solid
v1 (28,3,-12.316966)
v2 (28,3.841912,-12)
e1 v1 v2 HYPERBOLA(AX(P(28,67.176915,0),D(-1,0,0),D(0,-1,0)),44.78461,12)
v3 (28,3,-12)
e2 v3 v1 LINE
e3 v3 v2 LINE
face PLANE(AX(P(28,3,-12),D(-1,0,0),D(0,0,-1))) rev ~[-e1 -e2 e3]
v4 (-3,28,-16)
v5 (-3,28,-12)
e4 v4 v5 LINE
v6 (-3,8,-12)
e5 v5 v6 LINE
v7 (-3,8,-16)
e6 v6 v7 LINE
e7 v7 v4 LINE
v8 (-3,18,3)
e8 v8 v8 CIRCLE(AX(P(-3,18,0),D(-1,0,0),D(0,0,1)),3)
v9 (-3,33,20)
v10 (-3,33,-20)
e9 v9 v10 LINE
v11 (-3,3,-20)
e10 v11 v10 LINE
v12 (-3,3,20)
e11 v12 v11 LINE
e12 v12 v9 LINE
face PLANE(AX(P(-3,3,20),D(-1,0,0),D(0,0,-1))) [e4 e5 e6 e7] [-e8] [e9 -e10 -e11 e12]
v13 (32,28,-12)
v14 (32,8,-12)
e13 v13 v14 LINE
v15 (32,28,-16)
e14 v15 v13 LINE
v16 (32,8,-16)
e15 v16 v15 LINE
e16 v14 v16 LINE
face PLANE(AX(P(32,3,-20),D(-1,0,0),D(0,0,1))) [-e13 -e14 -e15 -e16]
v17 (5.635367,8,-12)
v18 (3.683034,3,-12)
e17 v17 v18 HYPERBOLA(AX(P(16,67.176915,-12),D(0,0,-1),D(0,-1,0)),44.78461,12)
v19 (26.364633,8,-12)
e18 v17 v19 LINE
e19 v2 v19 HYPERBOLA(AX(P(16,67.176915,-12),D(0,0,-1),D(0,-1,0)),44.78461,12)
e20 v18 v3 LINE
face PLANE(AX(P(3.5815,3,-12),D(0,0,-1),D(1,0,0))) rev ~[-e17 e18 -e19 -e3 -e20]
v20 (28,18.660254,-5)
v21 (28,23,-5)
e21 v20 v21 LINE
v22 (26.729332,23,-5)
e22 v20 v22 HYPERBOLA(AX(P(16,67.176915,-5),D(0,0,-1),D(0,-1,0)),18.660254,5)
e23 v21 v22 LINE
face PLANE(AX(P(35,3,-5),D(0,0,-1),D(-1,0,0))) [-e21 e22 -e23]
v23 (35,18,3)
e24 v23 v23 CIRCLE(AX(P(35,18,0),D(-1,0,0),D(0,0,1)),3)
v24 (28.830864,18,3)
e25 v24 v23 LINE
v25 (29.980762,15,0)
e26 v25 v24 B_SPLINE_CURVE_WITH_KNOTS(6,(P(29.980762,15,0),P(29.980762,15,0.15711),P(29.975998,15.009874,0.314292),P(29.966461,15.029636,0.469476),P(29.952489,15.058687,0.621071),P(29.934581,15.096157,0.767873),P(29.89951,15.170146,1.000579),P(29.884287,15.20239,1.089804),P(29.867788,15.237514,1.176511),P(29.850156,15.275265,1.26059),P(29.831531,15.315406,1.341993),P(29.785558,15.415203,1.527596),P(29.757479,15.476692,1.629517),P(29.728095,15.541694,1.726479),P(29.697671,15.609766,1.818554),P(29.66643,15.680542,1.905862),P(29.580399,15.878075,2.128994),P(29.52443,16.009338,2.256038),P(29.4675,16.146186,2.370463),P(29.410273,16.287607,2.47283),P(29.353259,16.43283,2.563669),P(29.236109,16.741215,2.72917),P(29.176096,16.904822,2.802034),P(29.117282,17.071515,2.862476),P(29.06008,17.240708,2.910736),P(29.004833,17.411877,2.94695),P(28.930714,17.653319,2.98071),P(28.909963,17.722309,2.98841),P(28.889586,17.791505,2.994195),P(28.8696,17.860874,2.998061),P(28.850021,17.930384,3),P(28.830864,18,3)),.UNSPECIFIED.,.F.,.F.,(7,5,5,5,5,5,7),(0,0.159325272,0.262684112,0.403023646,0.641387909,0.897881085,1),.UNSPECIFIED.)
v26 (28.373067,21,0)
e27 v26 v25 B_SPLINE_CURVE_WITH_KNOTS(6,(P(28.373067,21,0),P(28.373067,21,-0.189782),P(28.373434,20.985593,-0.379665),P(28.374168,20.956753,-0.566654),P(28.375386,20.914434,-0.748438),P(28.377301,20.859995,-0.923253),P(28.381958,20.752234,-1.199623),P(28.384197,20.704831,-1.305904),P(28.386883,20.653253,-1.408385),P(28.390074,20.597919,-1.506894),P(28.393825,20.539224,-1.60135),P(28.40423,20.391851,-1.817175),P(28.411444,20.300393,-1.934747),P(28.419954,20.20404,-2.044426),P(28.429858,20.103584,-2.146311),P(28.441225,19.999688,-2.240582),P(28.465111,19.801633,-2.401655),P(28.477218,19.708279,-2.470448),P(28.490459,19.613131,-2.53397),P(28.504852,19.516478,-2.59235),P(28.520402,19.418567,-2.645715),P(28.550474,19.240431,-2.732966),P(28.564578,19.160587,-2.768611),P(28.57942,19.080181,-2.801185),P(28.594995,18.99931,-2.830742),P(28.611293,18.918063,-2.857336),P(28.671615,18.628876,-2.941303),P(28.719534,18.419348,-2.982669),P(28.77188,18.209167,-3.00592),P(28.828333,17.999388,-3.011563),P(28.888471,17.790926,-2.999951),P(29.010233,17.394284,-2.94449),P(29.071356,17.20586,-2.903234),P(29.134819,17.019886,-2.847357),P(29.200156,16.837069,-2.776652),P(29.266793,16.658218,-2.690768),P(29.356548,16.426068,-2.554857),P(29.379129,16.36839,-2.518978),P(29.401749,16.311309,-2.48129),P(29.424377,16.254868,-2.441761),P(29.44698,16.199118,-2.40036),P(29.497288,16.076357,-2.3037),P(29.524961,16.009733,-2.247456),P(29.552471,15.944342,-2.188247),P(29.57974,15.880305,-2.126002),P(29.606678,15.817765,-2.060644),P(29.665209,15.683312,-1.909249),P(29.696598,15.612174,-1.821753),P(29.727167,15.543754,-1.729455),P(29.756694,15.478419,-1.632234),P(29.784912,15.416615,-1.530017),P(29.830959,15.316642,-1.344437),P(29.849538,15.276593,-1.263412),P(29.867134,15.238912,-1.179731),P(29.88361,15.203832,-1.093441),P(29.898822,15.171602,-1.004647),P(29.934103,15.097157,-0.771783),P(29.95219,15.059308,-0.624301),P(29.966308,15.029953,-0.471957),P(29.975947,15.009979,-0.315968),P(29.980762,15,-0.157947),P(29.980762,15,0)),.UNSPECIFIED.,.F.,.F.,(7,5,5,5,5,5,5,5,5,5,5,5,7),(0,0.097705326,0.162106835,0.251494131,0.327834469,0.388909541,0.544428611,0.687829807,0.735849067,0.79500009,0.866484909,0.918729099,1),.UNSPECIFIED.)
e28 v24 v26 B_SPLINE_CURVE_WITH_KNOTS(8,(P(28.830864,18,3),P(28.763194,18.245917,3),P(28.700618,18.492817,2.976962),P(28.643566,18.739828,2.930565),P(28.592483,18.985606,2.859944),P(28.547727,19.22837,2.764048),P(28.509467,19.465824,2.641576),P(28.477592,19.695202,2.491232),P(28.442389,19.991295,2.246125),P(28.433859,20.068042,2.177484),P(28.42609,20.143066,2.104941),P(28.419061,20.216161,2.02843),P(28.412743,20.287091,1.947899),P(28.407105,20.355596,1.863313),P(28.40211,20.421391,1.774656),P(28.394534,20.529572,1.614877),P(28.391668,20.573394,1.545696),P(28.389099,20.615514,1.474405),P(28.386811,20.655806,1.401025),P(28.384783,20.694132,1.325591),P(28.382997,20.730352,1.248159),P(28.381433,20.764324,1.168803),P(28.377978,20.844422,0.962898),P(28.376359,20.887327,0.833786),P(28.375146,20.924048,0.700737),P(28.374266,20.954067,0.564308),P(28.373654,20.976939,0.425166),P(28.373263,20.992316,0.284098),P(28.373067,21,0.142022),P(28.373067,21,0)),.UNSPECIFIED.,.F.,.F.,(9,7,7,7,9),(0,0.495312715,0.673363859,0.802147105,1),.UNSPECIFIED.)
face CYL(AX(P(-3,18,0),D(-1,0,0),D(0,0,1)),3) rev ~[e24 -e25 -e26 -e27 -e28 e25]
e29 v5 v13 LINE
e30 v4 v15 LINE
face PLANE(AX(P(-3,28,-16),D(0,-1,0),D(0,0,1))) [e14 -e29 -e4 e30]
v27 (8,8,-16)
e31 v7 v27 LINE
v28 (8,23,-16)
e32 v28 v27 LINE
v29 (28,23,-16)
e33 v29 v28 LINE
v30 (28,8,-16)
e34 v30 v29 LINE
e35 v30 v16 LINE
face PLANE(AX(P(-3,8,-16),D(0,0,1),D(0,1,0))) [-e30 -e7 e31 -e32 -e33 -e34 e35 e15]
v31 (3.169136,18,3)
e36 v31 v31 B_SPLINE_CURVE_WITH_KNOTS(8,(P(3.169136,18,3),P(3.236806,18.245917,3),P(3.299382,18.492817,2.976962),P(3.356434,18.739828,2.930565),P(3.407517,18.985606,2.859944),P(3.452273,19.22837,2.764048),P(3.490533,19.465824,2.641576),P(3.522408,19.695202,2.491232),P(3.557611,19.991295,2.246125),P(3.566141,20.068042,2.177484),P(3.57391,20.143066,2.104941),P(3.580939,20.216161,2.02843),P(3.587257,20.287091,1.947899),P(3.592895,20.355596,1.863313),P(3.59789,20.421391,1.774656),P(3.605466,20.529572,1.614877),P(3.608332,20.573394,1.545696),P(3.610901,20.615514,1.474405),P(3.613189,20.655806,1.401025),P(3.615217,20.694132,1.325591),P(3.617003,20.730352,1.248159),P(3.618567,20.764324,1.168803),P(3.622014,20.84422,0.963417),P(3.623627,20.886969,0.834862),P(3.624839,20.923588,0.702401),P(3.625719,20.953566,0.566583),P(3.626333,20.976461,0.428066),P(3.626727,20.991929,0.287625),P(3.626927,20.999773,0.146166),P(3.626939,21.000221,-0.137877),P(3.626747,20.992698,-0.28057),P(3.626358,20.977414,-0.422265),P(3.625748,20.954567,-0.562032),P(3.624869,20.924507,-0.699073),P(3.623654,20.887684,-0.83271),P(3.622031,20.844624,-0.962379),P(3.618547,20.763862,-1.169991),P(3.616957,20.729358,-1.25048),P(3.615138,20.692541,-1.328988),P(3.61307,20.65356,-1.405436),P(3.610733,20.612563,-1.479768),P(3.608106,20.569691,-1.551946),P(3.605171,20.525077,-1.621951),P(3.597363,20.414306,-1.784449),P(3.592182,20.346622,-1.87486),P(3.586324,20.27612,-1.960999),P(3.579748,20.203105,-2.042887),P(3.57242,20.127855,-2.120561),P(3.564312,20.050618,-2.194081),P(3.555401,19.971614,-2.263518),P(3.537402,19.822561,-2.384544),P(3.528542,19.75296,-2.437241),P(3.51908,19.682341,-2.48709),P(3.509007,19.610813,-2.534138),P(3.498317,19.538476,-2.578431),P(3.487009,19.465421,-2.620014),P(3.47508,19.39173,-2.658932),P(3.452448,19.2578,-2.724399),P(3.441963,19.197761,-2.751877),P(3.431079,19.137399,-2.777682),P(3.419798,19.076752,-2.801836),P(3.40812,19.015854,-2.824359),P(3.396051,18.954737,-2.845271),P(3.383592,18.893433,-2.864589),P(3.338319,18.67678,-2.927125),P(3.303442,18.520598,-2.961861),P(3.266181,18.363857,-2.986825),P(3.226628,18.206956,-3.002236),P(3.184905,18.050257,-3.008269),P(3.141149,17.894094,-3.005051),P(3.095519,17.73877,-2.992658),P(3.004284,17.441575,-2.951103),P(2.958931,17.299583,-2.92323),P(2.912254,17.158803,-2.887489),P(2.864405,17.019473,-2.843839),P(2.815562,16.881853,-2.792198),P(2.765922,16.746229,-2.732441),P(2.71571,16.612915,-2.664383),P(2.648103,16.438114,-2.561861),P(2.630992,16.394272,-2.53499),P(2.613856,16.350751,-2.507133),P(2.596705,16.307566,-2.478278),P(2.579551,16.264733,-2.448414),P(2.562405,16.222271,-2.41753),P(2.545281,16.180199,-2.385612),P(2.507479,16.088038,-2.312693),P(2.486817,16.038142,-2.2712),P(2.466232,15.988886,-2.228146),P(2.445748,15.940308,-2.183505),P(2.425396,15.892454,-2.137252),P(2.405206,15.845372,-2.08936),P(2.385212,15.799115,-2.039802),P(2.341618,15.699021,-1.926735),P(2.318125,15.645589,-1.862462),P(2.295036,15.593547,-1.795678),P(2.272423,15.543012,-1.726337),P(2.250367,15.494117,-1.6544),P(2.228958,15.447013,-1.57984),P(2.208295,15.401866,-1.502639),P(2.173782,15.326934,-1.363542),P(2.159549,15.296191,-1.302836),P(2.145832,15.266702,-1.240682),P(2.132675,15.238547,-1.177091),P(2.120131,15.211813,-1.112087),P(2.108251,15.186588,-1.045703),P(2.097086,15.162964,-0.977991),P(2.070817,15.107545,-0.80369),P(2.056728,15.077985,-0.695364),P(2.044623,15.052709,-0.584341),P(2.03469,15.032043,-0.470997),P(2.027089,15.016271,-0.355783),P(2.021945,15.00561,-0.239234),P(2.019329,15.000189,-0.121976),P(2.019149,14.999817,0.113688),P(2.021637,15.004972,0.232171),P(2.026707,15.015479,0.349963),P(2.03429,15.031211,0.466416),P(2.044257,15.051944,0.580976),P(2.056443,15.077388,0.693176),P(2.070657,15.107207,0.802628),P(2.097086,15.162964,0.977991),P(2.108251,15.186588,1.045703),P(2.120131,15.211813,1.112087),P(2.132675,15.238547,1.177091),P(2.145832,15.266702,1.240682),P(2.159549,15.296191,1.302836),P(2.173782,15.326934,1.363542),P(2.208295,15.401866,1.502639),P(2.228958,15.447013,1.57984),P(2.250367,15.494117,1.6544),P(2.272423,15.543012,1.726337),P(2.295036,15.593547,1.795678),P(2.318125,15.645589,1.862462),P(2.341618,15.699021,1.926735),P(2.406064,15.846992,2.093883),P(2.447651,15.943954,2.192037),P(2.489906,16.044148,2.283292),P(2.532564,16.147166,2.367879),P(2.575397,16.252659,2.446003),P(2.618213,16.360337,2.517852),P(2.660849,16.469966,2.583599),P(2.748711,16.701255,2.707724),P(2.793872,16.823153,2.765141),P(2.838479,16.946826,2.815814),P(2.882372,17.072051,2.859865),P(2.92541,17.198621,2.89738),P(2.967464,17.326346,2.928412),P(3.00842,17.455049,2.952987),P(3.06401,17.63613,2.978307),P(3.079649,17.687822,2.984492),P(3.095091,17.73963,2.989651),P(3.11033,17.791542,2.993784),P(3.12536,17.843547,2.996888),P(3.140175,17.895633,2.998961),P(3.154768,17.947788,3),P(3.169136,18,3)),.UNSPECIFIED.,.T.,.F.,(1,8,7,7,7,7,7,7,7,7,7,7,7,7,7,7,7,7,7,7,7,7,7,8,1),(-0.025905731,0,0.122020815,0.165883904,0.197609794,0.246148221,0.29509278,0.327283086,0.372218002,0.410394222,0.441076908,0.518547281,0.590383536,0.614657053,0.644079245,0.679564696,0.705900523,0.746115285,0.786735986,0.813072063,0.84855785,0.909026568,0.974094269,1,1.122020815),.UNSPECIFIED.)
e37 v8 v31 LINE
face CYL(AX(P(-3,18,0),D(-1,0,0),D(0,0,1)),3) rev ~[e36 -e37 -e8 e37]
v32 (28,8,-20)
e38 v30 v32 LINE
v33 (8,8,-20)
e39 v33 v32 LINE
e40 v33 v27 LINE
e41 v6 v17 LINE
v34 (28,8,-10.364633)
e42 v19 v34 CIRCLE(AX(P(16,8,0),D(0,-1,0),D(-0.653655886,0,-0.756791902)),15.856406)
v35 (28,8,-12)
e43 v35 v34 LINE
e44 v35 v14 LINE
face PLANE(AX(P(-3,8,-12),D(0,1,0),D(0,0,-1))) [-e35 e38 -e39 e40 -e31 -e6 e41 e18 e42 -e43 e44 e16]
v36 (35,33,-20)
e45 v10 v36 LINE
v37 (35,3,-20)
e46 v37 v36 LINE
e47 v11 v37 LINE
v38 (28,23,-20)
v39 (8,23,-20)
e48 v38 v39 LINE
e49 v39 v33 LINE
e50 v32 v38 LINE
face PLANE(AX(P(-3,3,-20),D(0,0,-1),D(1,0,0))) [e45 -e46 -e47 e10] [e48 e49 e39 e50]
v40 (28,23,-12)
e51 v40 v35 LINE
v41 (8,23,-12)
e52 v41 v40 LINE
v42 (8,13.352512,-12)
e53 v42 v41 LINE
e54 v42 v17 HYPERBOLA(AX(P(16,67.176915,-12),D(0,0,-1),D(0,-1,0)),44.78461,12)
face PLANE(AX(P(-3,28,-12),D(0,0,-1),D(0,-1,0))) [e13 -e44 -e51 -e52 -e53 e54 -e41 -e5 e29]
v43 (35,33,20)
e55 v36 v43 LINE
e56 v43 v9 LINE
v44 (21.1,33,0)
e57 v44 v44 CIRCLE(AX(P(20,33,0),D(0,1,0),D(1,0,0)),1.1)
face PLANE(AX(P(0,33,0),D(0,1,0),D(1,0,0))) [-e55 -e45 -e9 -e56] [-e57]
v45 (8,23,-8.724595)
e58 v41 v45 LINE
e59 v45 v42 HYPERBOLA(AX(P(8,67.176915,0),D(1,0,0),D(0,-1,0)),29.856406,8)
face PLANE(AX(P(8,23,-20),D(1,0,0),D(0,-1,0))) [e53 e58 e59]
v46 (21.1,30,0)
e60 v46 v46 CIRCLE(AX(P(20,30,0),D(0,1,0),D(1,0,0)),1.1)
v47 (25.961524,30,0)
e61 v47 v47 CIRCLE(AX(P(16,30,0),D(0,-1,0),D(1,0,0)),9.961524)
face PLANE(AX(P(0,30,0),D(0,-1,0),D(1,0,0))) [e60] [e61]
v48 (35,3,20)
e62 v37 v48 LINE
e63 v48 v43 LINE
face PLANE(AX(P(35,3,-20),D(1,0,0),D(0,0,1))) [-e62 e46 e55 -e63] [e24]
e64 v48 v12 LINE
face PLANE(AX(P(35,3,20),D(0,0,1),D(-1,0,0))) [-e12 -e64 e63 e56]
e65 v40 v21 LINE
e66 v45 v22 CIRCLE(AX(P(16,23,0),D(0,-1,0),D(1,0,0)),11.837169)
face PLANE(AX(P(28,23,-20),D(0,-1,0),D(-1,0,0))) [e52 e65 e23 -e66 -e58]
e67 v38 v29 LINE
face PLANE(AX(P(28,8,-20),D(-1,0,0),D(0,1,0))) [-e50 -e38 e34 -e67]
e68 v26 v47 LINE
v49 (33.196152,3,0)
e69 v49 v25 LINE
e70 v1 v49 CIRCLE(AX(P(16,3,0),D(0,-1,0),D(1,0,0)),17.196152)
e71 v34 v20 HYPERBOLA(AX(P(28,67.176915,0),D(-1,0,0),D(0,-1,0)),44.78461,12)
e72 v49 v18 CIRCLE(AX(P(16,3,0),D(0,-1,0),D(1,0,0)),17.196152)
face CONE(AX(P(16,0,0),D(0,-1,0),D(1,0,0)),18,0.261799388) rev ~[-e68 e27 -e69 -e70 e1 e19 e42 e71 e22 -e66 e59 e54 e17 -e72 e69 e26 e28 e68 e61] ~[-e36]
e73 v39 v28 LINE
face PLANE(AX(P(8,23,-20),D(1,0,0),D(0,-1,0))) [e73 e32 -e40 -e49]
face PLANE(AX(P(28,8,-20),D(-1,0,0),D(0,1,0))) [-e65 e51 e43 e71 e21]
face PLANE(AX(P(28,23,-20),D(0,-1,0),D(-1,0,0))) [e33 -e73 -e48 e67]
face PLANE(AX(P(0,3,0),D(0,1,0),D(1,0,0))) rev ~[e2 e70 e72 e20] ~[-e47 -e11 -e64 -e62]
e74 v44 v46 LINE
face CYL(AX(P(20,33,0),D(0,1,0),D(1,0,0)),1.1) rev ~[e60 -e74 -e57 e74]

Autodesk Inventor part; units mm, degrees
ref_plane "YZ Plane" through (0, 0, 0) normal (1, 0, 0) x (0, 1, 0)
ref_plane "XZ Plane" through (0, 0, 0) normal (0, 1, 0) x (-1, 0, 0)
ref_plane "XY Plane" through (0, 0, 0) normal (0, 0, 1) x (1, 0, 0)
ref_plane "Work Plane13" through (0, 3, 0) normal (0, 1, 0) x (1, 0, 0)
sketch "Sketch45" plane through (0, 3, 0) normal (0, 1, 0) x (1, 0, 0)
  line L0 (35, -20) -> (-3, -20)
  line L1 (-3, -20) -> (-3, 20)
  line L2 (-3, 20) -> (35, 20)
  line L3 (35, 20) -> (35, -20)
  point P0 (0, 0)
  dimension "d142" = 38
  dimension "d143" = 40
extrude "Extrusion34" add sketch "Sketch45" along normal blind 30
sketch "Sketch46" plane through (0, 33, 0) normal (0, 1, 0) x (1, 0, 0)
  point P0 (0, 0)
ref_plane "Work Plane11" through (0, 0, 0) normal (0, -1, 0) x (1, 0, 0)
sketch "Sketch47" plane through (0, 0, 0) normal (0, -1, 0) x (1, 0, 0)
  circle A0 centre (16, 0) radius 18
  point P0 (0, 0)
  dimension "d146" = 36
extrude "Extrusion35" cut sketch "Sketch47" against normal blind 30 draft -15
sketch "Sketch48" plane through (0, 33, 0) normal (0, 1, 0) x (1, 0, 0)
  point P0 (0, 0)
sketch "Sketch49" plane through (0, 33, 0) normal (0, 1, 0) x (1, 0, 0)
  circle A0 centre (20, 0) radius 1.1
  point P0 (0, 0)
  dimension "d149" = 2.2
extrude "Extrusion36" cut sketch "Sketch49" against normal through all
ref_plane "Work Plane7" through (35, 3, -20) normal (0, 0, -1) x (-1, 0, 0)
sketch "Sketch58" plane through (35, 3, -20) normal (0, 0, -1) x (-1, 0, 0)
  line L0 (7, 20) -> (27, 20)
  line L1 (27, 20) -> (27, 5)
  line L2 (27, 5) -> (7, 5)
  line L3 (7, 5) -> (7, 20)
  point P0 (35, -3)
  dimension "d156" = 20
  dimension "d157" = 15
extrude "Extrusion38" cut sketch "Sketch58" against normal blind 15
ref_plane "Work Plane4" through (-3, 3, -20) normal (-1, 0, 0) x (0, 0, 1)
sketch "Sketch59" plane through (-3, 3, -20) normal (-1, 0, 0) x (0, 0, 1)
  line L0 (4, 25) -> (8, 25)
  line L1 (8, 25) -> (8, 5)
  line L2 (8, 5) -> (4, 5)
  line L3 (4, 5) -> (4, 25)
  point P0 (20, -3)
  dimension "d160" = 4
  dimension "d161" = 20
extrude "Extrusion39" cut sketch "Sketch59" against normal blind 35
ref_plane "Work Plane1" through (0, 3, 0) normal (0, 1, 0) x (1, 0, 0)
ref_plane "Work Plane6" through (0, 23, 0) normal (0, 1, 0) x (1, 0, 0)
sketch "Sketch62" plane through (-3, 3, -20) normal (-1, 0, 0) x (0, 0, 1)
  circle A0 centre (20, 15) radius 3
  point P0 (20, -3)
  dimension "d172" = 6
extrude "Extrusion42" cut sketch "Sketch62" against normal through all
sketch "Sketch65" plane through (0, 3, 0) normal (0, -1, 0) x (1, 0, 0)
  line L0 (-3, -12) -> (32, -12) projected
  line L1 (28, -20) -> (28, -16) projected
  line L2 (3.5815, -12) -> (28, -12)
  line L3 (28, -12) -> (28, -17.2375)
  line L4 (28, -17.2375) -> (3.5815, -17.2375)
  line L5 (3.5815, -17.2375) -> (3.5815, -12)
  point P0 (0, 0)
extrude "Extrusion44" add sketch "Sketch65" against normal blind 5
properties part number "liquid port_only_v05"
